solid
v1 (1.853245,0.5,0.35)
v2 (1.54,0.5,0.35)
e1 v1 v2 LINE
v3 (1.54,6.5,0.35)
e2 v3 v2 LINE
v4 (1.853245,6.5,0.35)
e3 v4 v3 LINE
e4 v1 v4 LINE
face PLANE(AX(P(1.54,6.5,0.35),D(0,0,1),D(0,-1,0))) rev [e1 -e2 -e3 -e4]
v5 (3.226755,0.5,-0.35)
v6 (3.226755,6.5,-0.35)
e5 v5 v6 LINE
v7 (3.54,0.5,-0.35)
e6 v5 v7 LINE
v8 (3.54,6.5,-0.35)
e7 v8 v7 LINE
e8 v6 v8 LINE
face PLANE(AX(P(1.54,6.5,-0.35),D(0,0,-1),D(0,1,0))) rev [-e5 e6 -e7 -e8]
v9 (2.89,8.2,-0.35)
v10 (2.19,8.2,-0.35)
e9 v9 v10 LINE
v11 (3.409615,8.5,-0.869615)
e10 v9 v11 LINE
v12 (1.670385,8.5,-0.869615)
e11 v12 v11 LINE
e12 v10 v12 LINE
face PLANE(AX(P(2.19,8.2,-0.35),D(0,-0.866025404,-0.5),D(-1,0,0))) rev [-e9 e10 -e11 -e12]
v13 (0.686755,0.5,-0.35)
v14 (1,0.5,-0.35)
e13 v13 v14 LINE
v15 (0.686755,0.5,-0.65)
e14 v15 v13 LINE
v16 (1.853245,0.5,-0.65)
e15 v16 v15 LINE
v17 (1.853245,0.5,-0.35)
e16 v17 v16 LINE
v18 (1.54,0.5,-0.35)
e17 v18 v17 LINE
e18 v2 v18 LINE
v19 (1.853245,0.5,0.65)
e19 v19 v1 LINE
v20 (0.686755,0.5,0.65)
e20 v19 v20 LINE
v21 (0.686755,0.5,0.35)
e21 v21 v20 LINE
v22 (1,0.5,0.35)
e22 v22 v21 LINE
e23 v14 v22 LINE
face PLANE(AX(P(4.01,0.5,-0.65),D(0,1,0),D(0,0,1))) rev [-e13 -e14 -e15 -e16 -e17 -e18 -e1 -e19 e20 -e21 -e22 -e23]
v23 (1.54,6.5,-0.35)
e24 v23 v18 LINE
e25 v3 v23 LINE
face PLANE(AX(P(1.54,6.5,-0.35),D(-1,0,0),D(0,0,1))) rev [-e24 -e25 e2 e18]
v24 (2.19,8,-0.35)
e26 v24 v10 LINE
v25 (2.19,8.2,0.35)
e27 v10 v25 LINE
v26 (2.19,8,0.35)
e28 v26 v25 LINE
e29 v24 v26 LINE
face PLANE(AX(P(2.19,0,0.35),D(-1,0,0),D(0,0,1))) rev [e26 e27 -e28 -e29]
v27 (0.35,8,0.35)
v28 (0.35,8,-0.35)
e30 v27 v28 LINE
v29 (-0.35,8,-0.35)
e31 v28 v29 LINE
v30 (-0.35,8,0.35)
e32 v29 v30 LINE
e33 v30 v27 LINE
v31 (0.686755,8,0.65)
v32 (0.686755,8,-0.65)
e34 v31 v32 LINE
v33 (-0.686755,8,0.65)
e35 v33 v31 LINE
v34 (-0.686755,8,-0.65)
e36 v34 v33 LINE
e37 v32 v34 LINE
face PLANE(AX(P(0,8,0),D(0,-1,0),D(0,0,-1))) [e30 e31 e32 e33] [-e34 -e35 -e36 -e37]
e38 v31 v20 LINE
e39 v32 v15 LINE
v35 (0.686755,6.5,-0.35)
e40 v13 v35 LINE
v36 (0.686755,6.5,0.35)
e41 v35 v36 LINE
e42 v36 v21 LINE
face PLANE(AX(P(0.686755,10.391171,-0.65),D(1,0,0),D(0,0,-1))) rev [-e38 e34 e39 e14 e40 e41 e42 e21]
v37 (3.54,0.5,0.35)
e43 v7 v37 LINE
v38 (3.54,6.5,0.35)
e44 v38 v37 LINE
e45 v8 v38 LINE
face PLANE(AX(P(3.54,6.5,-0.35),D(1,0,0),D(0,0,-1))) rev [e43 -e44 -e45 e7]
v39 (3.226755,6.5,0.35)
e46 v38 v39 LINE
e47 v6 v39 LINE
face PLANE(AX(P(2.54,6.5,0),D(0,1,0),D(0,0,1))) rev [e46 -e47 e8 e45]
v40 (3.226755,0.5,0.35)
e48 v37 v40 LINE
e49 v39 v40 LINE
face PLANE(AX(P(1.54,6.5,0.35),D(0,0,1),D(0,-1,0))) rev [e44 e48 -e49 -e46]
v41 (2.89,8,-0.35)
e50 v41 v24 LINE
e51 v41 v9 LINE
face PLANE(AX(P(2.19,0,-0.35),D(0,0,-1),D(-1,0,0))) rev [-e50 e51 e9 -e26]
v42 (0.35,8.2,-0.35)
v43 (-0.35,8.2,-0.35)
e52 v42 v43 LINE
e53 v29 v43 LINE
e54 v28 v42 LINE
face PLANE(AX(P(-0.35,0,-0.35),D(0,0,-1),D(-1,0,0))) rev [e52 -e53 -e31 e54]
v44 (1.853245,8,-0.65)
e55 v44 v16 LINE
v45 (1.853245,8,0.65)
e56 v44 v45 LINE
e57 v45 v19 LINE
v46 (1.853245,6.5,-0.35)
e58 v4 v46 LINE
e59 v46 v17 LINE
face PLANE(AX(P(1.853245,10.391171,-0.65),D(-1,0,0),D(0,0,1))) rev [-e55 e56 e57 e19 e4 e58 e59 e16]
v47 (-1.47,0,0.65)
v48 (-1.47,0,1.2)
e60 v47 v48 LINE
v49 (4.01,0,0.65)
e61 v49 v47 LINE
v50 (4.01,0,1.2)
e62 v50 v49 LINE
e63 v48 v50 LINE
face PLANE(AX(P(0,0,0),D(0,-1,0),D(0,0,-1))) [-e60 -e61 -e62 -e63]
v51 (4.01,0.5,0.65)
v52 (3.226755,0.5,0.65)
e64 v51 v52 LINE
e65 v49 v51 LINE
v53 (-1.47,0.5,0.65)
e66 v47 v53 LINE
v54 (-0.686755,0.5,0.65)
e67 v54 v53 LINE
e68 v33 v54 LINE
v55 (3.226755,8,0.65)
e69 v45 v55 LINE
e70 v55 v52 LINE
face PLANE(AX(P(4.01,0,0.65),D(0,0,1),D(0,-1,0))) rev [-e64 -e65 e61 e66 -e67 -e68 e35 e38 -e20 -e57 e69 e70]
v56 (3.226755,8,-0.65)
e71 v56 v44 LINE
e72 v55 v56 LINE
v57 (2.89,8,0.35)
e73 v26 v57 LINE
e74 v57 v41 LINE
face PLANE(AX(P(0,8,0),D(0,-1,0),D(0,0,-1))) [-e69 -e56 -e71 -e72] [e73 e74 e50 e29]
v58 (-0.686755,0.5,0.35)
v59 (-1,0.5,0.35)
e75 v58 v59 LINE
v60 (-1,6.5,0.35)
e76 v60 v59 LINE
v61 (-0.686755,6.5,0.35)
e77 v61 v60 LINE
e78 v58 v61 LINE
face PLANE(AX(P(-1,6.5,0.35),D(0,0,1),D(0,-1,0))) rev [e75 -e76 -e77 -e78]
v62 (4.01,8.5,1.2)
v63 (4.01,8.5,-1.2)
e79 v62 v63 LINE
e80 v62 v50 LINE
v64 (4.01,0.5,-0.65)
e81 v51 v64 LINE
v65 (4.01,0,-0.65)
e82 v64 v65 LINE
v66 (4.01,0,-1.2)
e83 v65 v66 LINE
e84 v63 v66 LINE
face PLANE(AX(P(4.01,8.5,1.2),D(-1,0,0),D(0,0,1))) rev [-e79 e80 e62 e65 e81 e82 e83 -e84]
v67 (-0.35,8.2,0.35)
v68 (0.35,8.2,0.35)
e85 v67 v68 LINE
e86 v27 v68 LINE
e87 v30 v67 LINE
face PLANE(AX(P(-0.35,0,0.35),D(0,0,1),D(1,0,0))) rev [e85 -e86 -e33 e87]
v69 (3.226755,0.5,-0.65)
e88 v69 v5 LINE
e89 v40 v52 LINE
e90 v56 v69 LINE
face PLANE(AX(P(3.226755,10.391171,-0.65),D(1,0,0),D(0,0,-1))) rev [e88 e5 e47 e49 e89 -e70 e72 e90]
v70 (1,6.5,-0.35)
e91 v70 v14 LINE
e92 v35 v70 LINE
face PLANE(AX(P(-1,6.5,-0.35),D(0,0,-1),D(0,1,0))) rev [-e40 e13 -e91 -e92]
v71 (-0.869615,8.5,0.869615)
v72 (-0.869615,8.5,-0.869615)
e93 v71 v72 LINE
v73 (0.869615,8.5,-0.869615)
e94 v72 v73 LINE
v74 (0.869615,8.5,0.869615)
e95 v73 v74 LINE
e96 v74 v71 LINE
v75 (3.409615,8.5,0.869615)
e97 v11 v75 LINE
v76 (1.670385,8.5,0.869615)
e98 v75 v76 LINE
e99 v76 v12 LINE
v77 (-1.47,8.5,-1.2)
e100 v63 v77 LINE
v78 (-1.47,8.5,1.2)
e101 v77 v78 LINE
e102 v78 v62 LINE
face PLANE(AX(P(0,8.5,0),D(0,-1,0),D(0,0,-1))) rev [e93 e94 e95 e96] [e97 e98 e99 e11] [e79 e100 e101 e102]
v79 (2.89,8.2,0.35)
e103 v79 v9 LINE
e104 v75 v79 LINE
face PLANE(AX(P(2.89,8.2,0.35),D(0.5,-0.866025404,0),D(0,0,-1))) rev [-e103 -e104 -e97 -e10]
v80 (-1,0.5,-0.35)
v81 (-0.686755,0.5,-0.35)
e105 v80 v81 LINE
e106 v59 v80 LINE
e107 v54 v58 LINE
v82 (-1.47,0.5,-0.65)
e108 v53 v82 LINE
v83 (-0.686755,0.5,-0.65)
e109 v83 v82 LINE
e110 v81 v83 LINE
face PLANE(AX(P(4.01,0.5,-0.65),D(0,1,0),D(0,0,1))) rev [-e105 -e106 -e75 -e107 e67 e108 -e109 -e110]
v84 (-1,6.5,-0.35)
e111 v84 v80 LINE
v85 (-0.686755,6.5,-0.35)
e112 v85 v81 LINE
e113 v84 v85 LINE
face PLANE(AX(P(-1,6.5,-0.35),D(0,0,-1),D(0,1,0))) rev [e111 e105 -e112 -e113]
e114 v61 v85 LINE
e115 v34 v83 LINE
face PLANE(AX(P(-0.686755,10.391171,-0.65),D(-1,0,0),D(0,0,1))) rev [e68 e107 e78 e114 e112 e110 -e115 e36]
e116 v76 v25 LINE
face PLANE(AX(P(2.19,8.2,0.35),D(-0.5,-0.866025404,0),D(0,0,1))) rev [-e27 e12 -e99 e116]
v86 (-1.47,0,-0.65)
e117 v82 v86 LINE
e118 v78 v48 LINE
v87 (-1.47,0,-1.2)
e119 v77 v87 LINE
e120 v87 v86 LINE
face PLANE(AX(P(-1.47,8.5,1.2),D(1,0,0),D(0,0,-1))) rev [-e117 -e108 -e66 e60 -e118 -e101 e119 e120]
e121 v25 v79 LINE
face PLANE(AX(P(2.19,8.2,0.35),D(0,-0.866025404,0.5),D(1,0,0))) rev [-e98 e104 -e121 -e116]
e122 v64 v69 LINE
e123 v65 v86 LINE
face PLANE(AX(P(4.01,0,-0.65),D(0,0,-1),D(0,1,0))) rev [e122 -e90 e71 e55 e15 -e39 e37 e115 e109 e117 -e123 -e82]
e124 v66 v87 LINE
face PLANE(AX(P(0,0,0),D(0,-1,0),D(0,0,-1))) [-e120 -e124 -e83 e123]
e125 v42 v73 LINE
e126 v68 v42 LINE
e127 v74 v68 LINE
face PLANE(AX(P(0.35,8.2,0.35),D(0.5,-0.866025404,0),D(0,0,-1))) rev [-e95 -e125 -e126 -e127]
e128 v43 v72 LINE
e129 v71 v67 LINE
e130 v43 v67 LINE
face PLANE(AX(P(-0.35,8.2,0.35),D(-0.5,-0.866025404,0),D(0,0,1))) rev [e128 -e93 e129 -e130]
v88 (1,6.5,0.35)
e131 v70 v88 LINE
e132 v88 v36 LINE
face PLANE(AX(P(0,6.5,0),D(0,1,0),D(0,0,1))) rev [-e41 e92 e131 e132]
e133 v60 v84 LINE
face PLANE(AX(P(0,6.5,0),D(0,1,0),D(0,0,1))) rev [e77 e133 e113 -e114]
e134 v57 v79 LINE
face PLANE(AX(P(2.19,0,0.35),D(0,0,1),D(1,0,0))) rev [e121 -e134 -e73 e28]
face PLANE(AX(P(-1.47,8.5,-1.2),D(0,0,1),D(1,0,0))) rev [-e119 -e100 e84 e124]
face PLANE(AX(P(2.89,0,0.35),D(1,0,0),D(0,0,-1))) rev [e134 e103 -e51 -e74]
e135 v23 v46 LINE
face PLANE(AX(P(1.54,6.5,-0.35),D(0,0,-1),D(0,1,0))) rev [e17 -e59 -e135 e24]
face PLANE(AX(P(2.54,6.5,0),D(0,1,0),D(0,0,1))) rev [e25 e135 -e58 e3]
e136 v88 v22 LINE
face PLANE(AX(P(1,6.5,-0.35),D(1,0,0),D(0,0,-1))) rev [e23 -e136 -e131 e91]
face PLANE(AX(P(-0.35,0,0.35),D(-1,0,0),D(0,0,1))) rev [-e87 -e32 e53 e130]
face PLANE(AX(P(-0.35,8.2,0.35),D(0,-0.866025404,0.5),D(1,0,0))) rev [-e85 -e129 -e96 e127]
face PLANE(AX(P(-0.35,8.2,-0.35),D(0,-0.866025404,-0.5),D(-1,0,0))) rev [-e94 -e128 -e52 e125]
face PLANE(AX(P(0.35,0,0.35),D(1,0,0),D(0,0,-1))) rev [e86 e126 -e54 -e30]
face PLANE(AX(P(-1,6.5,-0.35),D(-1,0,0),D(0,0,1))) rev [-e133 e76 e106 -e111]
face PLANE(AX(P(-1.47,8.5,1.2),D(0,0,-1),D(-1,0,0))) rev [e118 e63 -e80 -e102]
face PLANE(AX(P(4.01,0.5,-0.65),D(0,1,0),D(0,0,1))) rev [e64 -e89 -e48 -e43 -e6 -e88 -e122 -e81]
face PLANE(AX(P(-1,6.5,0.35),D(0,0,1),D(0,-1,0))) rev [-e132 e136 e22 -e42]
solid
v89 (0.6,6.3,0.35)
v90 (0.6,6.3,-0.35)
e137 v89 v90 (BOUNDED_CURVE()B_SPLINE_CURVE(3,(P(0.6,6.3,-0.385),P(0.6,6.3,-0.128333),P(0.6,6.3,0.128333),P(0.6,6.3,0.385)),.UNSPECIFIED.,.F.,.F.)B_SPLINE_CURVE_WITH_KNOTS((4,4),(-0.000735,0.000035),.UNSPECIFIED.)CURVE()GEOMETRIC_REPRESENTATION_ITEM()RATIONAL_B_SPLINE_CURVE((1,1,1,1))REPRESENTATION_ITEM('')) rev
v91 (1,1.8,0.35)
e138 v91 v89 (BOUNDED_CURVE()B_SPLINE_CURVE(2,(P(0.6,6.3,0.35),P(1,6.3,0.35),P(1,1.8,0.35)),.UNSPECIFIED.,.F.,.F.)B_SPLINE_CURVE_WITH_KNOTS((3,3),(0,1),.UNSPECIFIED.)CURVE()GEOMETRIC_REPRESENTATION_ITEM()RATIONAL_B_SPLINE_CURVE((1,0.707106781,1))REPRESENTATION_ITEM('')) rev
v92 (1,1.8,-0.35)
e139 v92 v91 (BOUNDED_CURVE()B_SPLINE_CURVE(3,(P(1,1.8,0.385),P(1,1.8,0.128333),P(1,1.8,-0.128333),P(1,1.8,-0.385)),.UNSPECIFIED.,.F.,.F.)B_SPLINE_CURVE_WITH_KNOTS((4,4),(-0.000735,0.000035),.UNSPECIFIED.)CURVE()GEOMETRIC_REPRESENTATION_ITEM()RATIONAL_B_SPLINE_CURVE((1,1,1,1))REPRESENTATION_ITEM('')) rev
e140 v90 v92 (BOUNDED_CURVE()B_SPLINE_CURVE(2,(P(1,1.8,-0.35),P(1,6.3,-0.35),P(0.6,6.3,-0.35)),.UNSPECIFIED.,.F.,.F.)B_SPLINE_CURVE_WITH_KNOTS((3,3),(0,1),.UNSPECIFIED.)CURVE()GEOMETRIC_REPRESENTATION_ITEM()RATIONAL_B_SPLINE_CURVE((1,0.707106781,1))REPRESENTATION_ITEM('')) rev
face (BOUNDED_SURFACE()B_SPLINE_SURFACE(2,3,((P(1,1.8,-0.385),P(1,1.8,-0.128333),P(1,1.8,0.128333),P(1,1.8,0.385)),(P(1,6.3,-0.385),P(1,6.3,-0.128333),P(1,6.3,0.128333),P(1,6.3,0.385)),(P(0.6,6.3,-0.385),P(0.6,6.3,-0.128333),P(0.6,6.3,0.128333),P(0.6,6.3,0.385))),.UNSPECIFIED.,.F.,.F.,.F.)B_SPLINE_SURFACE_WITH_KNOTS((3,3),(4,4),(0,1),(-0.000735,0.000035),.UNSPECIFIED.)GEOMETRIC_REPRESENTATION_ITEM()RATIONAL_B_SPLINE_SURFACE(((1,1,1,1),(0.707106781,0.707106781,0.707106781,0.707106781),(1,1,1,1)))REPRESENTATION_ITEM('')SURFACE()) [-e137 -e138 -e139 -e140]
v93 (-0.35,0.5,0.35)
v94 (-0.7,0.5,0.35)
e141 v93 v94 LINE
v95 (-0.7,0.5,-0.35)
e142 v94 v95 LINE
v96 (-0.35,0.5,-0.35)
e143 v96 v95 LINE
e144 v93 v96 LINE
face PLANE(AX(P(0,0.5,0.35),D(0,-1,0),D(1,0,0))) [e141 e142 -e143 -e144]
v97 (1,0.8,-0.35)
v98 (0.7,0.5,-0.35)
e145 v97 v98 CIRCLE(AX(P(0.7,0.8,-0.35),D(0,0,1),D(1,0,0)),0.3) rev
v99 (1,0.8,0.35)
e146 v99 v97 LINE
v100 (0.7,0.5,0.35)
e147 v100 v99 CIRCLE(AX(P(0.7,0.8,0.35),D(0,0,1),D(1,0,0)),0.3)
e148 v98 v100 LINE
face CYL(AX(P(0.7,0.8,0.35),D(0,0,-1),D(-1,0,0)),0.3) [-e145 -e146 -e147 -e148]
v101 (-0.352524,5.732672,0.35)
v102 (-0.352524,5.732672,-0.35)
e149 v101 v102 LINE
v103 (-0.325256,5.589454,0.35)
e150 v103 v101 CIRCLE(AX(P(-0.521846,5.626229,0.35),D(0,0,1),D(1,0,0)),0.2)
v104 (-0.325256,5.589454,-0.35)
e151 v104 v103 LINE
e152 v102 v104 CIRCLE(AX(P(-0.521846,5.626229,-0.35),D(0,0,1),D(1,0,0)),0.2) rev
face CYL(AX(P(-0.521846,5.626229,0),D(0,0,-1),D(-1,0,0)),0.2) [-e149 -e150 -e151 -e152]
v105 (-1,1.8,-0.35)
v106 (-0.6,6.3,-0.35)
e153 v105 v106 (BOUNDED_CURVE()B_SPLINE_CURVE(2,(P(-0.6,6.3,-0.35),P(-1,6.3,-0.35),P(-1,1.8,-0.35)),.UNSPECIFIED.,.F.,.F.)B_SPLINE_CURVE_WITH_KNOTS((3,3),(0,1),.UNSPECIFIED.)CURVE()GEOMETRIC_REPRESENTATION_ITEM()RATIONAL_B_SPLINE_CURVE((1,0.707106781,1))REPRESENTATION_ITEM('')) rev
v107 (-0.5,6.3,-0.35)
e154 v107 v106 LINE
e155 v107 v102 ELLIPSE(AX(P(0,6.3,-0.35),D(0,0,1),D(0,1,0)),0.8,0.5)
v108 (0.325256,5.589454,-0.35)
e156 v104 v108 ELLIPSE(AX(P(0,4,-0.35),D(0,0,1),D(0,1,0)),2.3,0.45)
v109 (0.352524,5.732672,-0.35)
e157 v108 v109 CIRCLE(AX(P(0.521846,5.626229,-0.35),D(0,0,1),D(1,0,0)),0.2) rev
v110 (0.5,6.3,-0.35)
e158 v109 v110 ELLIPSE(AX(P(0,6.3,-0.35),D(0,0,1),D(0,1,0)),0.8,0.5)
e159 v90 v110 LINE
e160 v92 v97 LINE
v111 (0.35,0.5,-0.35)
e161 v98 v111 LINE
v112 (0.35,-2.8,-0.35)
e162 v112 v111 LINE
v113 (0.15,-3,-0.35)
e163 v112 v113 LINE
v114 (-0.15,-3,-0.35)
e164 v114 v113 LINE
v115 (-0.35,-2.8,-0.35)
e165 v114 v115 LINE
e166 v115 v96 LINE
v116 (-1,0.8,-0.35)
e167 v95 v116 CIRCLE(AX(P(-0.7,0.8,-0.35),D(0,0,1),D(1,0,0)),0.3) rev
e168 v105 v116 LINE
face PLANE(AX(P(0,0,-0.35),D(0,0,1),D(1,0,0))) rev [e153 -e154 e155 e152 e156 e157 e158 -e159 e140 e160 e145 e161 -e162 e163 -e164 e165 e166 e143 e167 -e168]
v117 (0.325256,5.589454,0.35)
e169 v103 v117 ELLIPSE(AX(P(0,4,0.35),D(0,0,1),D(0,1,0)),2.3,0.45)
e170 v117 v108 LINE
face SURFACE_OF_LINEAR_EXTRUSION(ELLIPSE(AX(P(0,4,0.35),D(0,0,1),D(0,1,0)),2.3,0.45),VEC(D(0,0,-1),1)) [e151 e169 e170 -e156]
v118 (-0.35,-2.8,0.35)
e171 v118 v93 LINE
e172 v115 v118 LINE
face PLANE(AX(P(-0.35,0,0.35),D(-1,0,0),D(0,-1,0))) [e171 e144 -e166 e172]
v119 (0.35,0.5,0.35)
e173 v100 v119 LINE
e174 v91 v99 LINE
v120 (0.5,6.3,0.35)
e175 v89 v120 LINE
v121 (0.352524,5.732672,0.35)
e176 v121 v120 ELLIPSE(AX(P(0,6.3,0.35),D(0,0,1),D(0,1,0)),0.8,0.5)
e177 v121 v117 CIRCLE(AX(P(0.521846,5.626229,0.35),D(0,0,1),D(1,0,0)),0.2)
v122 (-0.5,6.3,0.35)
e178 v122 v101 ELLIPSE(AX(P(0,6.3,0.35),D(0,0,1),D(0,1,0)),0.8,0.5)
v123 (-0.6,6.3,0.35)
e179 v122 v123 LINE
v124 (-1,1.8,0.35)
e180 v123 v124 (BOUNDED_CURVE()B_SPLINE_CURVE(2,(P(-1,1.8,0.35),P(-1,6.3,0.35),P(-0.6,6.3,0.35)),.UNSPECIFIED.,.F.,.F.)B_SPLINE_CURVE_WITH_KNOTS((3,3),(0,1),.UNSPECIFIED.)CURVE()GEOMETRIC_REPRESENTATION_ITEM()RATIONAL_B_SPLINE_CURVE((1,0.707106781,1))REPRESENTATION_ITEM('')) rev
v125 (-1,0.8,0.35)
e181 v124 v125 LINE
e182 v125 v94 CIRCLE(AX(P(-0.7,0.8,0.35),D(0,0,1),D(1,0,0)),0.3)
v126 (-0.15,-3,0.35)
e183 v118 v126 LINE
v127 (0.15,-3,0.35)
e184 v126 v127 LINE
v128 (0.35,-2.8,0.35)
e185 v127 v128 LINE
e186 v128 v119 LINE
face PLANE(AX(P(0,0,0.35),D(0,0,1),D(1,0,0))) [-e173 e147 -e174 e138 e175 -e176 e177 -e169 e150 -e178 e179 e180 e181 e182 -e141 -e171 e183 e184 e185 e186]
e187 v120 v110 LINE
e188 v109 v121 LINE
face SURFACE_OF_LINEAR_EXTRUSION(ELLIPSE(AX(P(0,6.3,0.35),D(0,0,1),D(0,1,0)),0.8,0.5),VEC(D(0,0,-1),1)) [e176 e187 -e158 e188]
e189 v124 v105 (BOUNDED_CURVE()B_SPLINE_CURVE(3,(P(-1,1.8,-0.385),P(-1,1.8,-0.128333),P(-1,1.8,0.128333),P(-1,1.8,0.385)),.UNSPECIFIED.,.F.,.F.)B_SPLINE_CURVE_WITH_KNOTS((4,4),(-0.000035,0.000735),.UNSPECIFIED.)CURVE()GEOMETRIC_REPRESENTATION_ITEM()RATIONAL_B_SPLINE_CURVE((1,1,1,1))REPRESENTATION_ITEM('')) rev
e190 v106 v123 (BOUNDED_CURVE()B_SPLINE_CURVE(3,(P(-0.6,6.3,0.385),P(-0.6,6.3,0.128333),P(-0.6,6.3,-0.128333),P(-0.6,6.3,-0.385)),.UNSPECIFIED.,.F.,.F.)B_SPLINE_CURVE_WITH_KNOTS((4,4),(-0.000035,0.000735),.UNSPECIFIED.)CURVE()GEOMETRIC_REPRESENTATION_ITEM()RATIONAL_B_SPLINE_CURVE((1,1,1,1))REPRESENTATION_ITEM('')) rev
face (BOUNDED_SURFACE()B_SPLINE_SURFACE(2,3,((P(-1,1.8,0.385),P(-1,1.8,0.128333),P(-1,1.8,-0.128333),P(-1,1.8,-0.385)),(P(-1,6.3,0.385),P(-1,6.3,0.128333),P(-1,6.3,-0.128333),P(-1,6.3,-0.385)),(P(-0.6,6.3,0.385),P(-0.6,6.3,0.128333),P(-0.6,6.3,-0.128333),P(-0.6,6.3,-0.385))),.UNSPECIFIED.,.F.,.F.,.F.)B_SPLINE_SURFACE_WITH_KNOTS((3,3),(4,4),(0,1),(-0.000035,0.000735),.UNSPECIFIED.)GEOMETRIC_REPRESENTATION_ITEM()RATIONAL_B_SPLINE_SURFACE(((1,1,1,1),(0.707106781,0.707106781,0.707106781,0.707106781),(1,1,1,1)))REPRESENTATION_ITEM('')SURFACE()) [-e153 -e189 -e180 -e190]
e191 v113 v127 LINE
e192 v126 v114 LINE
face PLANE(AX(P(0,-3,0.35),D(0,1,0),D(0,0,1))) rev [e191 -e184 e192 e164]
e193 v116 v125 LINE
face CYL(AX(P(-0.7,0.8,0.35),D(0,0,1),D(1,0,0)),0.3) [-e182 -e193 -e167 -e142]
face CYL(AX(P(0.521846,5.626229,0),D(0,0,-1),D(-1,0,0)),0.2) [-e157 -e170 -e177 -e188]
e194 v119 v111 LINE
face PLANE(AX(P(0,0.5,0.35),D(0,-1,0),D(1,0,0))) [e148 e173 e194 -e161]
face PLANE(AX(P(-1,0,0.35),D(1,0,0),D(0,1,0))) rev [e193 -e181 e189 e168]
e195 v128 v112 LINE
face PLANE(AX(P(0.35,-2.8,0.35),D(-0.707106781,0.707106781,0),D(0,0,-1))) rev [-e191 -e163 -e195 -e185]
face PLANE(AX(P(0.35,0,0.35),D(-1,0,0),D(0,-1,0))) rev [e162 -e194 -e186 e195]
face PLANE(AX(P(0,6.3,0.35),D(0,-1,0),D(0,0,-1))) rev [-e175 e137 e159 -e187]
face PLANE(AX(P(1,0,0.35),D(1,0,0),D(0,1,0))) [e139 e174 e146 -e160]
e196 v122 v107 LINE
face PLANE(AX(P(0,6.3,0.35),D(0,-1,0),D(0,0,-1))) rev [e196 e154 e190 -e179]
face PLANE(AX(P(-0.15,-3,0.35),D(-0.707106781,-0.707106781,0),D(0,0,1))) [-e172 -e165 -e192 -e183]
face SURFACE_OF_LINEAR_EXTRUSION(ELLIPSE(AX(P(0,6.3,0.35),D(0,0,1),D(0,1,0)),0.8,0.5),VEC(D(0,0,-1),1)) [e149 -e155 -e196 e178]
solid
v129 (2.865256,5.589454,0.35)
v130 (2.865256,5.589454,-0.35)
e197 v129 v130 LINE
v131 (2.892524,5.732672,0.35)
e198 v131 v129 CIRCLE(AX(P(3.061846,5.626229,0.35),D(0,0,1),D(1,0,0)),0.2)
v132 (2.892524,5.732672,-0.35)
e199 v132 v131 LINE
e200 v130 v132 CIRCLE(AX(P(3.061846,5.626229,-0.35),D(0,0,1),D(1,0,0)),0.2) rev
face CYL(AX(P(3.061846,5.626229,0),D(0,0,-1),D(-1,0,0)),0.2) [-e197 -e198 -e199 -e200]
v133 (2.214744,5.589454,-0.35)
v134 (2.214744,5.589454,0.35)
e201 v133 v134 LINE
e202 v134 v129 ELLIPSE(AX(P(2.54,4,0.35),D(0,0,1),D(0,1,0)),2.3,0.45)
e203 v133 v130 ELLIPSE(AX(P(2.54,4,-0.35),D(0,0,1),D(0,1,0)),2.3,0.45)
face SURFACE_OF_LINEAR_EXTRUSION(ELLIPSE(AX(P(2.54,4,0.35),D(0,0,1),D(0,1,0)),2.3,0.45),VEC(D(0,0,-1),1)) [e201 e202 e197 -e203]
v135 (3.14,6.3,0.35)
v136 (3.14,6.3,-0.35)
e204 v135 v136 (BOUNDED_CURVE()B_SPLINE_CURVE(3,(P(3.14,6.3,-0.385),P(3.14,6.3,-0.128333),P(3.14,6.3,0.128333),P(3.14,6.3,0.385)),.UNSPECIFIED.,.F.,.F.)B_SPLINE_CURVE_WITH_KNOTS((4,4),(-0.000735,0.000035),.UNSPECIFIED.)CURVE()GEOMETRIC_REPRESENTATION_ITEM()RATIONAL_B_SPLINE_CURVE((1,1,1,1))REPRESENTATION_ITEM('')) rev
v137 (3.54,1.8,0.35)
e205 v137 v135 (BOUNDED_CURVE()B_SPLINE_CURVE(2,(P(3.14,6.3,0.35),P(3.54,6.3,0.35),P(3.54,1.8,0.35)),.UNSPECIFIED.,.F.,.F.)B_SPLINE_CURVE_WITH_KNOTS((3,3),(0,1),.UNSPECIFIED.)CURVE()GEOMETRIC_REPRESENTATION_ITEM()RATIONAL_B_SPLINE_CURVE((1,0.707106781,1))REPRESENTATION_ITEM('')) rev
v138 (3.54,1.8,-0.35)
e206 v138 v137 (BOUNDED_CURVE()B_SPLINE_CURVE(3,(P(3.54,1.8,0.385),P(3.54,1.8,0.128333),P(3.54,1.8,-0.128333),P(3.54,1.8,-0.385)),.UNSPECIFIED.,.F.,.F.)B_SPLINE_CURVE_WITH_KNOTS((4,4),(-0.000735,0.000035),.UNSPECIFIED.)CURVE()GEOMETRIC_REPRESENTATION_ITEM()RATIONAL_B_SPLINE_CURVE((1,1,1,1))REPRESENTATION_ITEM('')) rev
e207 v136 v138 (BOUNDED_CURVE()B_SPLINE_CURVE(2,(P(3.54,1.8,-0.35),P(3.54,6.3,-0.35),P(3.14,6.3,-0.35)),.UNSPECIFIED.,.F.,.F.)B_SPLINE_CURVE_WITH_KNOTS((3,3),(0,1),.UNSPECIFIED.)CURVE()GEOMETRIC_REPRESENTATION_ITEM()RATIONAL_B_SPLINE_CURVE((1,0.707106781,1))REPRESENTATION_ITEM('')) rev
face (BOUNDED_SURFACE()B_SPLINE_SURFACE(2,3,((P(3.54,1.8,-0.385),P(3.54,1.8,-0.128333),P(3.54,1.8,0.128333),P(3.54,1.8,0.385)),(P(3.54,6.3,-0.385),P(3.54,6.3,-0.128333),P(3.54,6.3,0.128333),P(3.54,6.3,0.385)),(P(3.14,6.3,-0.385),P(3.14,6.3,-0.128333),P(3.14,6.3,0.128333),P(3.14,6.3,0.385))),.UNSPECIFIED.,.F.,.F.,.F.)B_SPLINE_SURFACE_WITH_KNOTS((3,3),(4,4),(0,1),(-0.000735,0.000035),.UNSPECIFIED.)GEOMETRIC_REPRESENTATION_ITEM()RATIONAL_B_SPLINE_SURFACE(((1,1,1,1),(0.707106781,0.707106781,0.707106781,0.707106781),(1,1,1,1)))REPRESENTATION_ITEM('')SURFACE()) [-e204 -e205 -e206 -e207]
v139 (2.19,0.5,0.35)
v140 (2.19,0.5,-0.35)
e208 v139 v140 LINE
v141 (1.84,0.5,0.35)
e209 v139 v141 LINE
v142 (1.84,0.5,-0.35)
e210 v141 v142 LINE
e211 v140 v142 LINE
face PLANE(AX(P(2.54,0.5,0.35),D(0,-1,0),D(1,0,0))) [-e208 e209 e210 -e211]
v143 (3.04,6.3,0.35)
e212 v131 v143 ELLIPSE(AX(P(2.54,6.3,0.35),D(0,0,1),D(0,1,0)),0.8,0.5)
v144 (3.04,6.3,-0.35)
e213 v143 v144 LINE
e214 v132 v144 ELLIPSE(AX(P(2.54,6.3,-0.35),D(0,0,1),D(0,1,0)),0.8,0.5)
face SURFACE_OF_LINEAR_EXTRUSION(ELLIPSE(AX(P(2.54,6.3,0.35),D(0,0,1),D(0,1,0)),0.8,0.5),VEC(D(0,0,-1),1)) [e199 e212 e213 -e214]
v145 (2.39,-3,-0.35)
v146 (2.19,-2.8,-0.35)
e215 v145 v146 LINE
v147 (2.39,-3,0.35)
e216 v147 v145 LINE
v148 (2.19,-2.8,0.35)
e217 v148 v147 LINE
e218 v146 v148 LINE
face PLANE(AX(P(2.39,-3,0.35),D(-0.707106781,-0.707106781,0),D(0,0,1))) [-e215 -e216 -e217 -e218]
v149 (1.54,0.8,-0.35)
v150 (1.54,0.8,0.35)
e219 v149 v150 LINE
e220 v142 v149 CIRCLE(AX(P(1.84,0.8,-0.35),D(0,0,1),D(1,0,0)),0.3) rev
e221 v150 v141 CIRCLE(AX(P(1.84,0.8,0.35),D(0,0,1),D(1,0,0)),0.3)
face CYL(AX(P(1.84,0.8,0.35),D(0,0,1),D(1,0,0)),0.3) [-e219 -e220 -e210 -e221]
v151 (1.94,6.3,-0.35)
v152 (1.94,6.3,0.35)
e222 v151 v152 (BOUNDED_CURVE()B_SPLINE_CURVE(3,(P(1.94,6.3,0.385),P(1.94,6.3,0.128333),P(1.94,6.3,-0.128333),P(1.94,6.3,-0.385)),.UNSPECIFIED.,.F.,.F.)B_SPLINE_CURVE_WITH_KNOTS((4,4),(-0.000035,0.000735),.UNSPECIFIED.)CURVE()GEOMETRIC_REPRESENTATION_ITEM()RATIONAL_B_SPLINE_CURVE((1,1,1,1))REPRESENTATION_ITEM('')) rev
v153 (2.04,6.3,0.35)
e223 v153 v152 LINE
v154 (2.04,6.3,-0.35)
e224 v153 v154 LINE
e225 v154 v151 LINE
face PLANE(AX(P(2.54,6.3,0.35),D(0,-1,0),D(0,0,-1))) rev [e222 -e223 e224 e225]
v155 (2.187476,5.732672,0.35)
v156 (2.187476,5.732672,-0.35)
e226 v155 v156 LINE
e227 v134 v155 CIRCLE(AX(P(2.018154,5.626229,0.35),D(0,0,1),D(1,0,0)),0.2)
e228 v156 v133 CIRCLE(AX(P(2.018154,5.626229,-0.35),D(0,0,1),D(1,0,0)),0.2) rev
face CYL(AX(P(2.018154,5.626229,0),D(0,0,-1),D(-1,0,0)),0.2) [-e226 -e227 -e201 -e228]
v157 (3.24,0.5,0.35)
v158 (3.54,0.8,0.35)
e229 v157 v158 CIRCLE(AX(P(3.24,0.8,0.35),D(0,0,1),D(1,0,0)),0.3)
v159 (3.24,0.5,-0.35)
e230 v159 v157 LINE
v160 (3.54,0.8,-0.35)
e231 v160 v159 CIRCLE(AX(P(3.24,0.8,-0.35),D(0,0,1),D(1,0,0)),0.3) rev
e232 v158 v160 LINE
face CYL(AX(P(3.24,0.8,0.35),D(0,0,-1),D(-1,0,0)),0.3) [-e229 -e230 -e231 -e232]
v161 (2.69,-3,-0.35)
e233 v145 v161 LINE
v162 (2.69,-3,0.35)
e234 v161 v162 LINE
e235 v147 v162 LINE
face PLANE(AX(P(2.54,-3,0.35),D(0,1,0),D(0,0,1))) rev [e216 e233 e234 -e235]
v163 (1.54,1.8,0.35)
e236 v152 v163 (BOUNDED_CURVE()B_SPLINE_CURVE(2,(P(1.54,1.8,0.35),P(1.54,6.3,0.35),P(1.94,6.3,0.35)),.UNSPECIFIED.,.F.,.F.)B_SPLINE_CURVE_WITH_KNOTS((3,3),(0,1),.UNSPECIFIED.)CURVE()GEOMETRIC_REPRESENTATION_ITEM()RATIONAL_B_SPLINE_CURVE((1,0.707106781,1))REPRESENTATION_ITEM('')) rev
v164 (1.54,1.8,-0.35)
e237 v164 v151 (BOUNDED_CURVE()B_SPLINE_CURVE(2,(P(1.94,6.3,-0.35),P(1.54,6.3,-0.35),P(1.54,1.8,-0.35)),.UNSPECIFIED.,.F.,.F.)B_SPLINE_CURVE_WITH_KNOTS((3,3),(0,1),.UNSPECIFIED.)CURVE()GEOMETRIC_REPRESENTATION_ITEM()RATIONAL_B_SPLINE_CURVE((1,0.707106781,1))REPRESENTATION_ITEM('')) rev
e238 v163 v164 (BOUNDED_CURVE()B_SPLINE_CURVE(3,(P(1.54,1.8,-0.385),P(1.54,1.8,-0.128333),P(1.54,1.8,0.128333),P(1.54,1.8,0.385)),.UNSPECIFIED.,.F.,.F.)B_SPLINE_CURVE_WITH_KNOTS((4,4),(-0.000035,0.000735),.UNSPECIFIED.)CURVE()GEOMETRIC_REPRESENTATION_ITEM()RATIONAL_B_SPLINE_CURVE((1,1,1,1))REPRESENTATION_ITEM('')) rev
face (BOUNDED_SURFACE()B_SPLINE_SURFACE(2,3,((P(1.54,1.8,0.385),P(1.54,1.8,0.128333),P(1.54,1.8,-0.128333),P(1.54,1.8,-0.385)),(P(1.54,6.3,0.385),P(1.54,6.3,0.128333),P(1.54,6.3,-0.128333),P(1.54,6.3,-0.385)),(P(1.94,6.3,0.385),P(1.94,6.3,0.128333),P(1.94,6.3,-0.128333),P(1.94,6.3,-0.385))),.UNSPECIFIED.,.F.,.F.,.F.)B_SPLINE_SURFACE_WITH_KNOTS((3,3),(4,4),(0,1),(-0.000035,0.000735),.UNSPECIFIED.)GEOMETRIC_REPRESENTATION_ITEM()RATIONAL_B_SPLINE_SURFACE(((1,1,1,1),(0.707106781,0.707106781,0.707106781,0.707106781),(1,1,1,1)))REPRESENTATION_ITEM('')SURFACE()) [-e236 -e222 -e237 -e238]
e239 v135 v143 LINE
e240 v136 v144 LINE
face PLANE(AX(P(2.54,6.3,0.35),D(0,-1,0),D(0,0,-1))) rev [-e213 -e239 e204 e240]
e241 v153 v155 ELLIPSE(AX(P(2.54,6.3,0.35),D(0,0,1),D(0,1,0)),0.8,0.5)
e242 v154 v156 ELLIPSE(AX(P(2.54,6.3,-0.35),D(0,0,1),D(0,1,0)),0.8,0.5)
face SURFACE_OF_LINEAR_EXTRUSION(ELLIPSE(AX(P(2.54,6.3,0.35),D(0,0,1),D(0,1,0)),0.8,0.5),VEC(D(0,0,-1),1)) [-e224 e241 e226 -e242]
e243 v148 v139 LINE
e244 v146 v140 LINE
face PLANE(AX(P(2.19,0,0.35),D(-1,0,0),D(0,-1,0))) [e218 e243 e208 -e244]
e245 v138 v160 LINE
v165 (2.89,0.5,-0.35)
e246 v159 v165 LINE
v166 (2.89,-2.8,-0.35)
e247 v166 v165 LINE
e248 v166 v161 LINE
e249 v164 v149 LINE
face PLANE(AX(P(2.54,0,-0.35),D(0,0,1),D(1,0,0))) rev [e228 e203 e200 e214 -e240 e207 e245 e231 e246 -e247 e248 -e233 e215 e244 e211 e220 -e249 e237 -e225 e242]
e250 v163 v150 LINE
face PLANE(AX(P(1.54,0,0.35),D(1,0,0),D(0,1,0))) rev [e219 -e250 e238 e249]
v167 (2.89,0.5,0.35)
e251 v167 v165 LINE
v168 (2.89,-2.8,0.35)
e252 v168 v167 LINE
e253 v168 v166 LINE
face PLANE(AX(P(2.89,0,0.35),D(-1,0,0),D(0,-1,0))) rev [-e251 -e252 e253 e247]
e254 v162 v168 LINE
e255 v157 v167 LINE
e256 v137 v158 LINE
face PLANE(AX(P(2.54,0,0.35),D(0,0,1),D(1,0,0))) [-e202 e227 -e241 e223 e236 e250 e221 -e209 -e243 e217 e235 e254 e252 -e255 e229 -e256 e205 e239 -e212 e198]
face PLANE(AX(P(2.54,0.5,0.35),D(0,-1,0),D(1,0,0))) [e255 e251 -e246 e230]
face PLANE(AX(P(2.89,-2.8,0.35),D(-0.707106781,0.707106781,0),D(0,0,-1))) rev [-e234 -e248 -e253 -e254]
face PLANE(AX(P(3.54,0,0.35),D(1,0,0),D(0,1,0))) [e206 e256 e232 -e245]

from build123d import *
from OCP.BRepFilletAPI import BRepFilletAPI_MakeChamfer

# Parameters (mm, degrees)
SKETCH8_W              = 5.48
SKETCH8_H              = 2.4
BOSS_EXTRUDE3_DEPTH    = 8.5
SKETCH9_W              = 1.3
SKETCH9_H              = 0.5
CUT_EXTRUDE5_DEPTH     = 11.184321283
SKETCH13_W             = 0.7
SKETCH13_H             = 0.7
CUT_EXTRUDE8_DEPTH     = 10.474708439
CHAMFER4_SIZE          = 0.3
CHAMFER4_SIZE2         = 0.519615242
SKETCH10_W             = 1.373509866
SKETCH10_H             = 1.3
CUT_EXTRUDE6_DEPTH     = 7.5
SKETCH11_W             = 2
SKETCH11_H             = 0.7
CUT_EXTRUDE7_DEPTH     = 6
BOSS_EXTRUDE4_DEPTH    = 0.35
FILLET1_R              = 0.2
FILLET2_SIZE           = 0.4
FILLET2_SIZE_2         = 4.5
CHAMFER5_SIZE          = 0.2
FILLET3_R              = 0.3
LPATTERN17_START       = 1.853245067
LPATTERN17_DEPTH       = 1.373509866
LPATTERN17_START_2     = 1.54
LPATTERN17_2_OUTLINE_W = 6
LPATTERN17_2_OUTLINE_H = 0.7
LPATTERN17_2_DEPTH     = 2
LPATTERN17_START_3     = 1.670384758
LPATTERN17_3_DEPTH     = 1.739230484
LPATTERN17_START_4     = -0.869615242
LPATTERN17_4_DEPTH     = 1.739230484
LPATTERN18_COUNT       = 2
LPATTERN18_PITCH       = 2.54


with BuildPart() as part:
    # Sketch8 → Boss-Extrude3 (new body)
    with BuildSketch(Plane(origin=(0, 0, 0), x_dir=(1, 0, 0), z_dir=(0, 1, 0))):
        with Locations((1.27, 0)):
            Rectangle(SKETCH8_W, SKETCH8_H)
    extrude(amount=BOSS_EXTRUDE3_DEPTH)

    # Sketch9 → Cut-Extrude5 (cut, through all)
    with BuildSketch(Plane.ZY.offset(1.47)):
        with Locations((0, 0.25)):
            Rectangle(SKETCH9_W, SKETCH9_H)
    extrude(amount=-CUT_EXTRUDE5_DEPTH, mode=Mode.SUBTRACT)

    # Sketch13 → Cut-Extrude8 (cut, through all)
    with BuildSketch(Plane(origin=(0, 8.5, 0), x_dir=(1, 0, 0), z_dir=(0, 1, 0))):
        Rectangle(SKETCH13_W, SKETCH13_H)
    extrude(amount=-CUT_EXTRUDE8_DEPTH, mode=Mode.SUBTRACT)

    # Chamfer4: one chamfer whose edges measure the first distance from different faces: ONE call of the kernel's chamfer builder (chamfer() names one face for all edges)
    chamfer4_edges_1 = [part.edges().sort_by_distance(p)[0] for p in [
        (0.35, 8.5, 0),
    ]]
    chamfer4_side_1 = [part.faces().sort_by_distance(p)[0] for p in [
        (0.35, 4.5, 0),
    ]]
    chamfer4_edges_2 = [part.edges().sort_by_distance(p)[0] for p in [
        (0, 8.5, -0.35),
    ]]
    chamfer4_side_2 = [part.faces().sort_by_distance(p)[0] for p in [
        (0, 4.5, -0.35),
    ]]
    chamfer4_edges_3 = [part.edges().sort_by_distance(p)[0] for p in [
        (-0.35, 8.5, 0),
    ]]
    chamfer4_side_3 = [part.faces().sort_by_distance(p)[0] for p in [
        (-0.35, 4.5, 0),
    ]]
    chamfer4_edges_4 = [part.edges().sort_by_distance(p)[0] for p in [
        (0, 8.5, 0.35),
    ]]
    chamfer4_side_4 = [part.faces().sort_by_distance(p)[0] for p in [
        (0, 4.5, 0.35),
    ]]
    chamfer4 = BRepFilletAPI_MakeChamfer(part.part.solid().wrapped)
    for e in chamfer4_edges_1:
        chamfer4.Add(CHAMFER4_SIZE, CHAMFER4_SIZE2, e.wrapped, chamfer4_side_1[0].wrapped)  # the first distance lies on this face
    for e in chamfer4_edges_2:
        chamfer4.Add(CHAMFER4_SIZE, CHAMFER4_SIZE2, e.wrapped, chamfer4_side_2[0].wrapped)  # the first distance lies on this face
    for e in chamfer4_edges_3:
        chamfer4.Add(CHAMFER4_SIZE, CHAMFER4_SIZE2, e.wrapped, chamfer4_side_3[0].wrapped)  # the first distance lies on this face
    for e in chamfer4_edges_4:
        chamfer4.Add(CHAMFER4_SIZE, CHAMFER4_SIZE2, e.wrapped, chamfer4_side_4[0].wrapped)  # the first distance lies on this face
    add(Compound.cast(chamfer4.Shape()), mode=Mode.REPLACE)

    # Sketch10 → Cut-Extrude6 (cut)
    with BuildSketch(Plane.XZ.offset(-0.5)):
        Rectangle(SKETCH10_W, SKETCH10_H)
    extrude(amount=-CUT_EXTRUDE6_DEPTH, mode=Mode.SUBTRACT)

    # Sketch11 → Cut-Extrude7 (cut)
    with BuildSketch(Plane.XZ.offset(-0.5)):
        Rectangle(SKETCH11_W, SKETCH11_H)
    extrude(amount=-CUT_EXTRUDE7_DEPTH, mode=Mode.SUBTRACT)

    # LPattern17: read off the stored shape, not the designer's step
    # LPattern17 outline → LPattern17 (cut)
    with BuildSketch(Plane.YZ.offset(LPATTERN17_START)):
        Polygon((8.5, 0.869615242), (8.2, 0.35), (8, 0.35), (8, 0.65), (0.5, 0.65), (0.5, -0.65), (8, -0.65), (8, -0.35), (8.2, -0.35), (8.5, -0.869615242), align=None)
    extrude(amount=LPATTERN17_DEPTH, mode=Mode.SUBTRACT)

    # LPattern17 2 outline → LPattern17 2 (cut)
    with BuildSketch(Plane.YZ.offset(LPATTERN17_START_2)):
        with Locations((3.5, 0)):
            Rectangle(LPATTERN17_2_OUTLINE_W, LPATTERN17_2_OUTLINE_H)
    extrude(amount=LPATTERN17_2_DEPTH, mode=Mode.SUBTRACT)

    # LPattern17 3 outline → LPattern17 3 (cut)
    with BuildSketch(Plane.YZ.offset(LPATTERN17_START_3)):
        Polygon((8.5, 0.869615242), (8.2, 0.35), (8, 0.35), (8, -0.35), (8.2, -0.35), (8.5, -0.869615242), align=None)
    extrude(amount=LPATTERN17_3_DEPTH, mode=Mode.SUBTRACT)

    # LPattern17 4 outline → LPattern17 4 (add)
    with BuildSketch(Plane.XY.offset(LPATTERN17_START_4)):
        Polygon((1.670384758, 8), (2.19, 8), (2.19, 8.2), (1.670384758, 8.5), align=None)
        Polygon((2.89, 8.2), (2.89, 8), (3.409615242, 8), (3.409615242, 8.5), align=None)
    extrude(amount=LPATTERN17_4_DEPTH)


with BuildPart() as body_2:
    # Sketch12 → Boss-Extrude4 (new, symmetric)
    with BuildSketch(Plane.XY):
        with BuildLine():
            Line((1, 0.5), (1, 6.3))
            Line((1, 6.3), (0.5, 6.3))
            add(Edge.make_bspline(
                [(0.309160803, 5.671259854), (0.5, 5.911486281), (0.5, 6.3)],
                knots=[3.808197993, 3.808197993, 3.808197993, 4.71238898, 4.71238898, 4.71238898], degree=2, weights=[1, 0.899533658, 1]))
            add(Edge.make_bspline(
                [(-0.309160803, 5.671259854), (-1.130943922, 1.7), (0, 1.7), (1.130943922, 1.7), (0.309160803, 5.671259854)],
                knots=[0.757385496, 0.757385496, 0.757385496, 3.141592654, 3.141592654, 5.525799811, 5.525799811, 5.525799811], degree=2, weights=[1, 0.369706154, 1, 0.369706154, 1]))
            add(Edge.make_bspline(
                [(-0.5, 6.3), (-0.5, 5.911486281), (-0.309160803, 5.671259854)],
                knots=[1.570796327, 1.570796327, 1.570796327, 2.474987314, 2.474987314, 2.474987314], degree=2, weights=[1, 0.899533658, 1]))
            Line((-0.5, 6.3), (-1, 6.3))
            Line((-1, 6.3), (-1, 0.5))
            Line((-1, 0.5), (-0.35, 0.5))
            Line((-0.35, 0.5), (-0.35, -3))
            Line((-0.35, -3), (0.35, -3))
            Line((0.35, -3), (0.35, 0.5))
            Line((0.35, 0.5), (1, 0.5))
        make_face()
    extrude(amount=BOSS_EXTRUDE4_DEPTH, both=True)

    # Fillet1
    fillet1_edges = [body_2.edges().sort_by_distance(p)[0] for p in [
        (-0.309160803, 5.671259854, 0.175),
        (0.309160803, 5.671259854, 0.175),
    ]]
    fillet(fillet1_edges, radius=FILLET1_R)

    # Fillet2
    # a fillet whose section is not a circle: 4.5, 0.4 mm, written as the material it takes off along each edge
    with BuildSketch(Plane(origin=(-1, 6.3, -11.6), x_dir=(1, 0, 0), z_dir=(0, 0, 1))) as fillet2_piece_1:
        with BuildLine():
            Bezier((FILLET2_SIZE, 0), (0, 0), (0, -FILLET2_SIZE_2), weights=[1, 0.707106781, 1])
            Line((0, -FILLET2_SIZE_2), (0, 0))
            Line((0, 0), (FILLET2_SIZE, 0))
        make_face()
    extrude(amount=23.2, mode=Mode.SUBTRACT)
    with BuildSketch(Plane(origin=(1, 6.3, -11.6), x_dir=(-1, 0, 0), z_dir=(0, 0, 1))) as fillet2_piece_2:
        with BuildLine():
            Bezier((FILLET2_SIZE, 0), (0, 0), (0, FILLET2_SIZE_2), weights=[1, 0.707106781, 1])
            Line((0, FILLET2_SIZE_2), (0, 0))
            Line((0, 0), (FILLET2_SIZE, 0))
        make_face()
    extrude(amount=23.2, mode=Mode.SUBTRACT)

    # Chamfer5
    chamfer5_edges = [body_2.edges().sort_by_distance(p)[0] for p in [
        (0.35, -3, 0),
        (-0.35, -3, 0),
    ]]
    chamfer(chamfer5_edges, length=CHAMFER5_SIZE)

    # Fillet3
    fillet3_edges = [body_2.edges().sort_by_distance(p)[0] for p in [
        (1, 0.5, 0),
        (-1, 0.5, 0),
    ]]
    fillet(fillet3_edges, radius=FILLET3_R)


with BuildPart() as lpattern18_1:
    # LPattern18: pattern copy
    add(body_2.part.moved(Location(Vector(1, 0, 0) * (1 * LPATTERN18_PITCH))))


solid = Compound([part.part, body_2.part, lpattern18_1.part])
